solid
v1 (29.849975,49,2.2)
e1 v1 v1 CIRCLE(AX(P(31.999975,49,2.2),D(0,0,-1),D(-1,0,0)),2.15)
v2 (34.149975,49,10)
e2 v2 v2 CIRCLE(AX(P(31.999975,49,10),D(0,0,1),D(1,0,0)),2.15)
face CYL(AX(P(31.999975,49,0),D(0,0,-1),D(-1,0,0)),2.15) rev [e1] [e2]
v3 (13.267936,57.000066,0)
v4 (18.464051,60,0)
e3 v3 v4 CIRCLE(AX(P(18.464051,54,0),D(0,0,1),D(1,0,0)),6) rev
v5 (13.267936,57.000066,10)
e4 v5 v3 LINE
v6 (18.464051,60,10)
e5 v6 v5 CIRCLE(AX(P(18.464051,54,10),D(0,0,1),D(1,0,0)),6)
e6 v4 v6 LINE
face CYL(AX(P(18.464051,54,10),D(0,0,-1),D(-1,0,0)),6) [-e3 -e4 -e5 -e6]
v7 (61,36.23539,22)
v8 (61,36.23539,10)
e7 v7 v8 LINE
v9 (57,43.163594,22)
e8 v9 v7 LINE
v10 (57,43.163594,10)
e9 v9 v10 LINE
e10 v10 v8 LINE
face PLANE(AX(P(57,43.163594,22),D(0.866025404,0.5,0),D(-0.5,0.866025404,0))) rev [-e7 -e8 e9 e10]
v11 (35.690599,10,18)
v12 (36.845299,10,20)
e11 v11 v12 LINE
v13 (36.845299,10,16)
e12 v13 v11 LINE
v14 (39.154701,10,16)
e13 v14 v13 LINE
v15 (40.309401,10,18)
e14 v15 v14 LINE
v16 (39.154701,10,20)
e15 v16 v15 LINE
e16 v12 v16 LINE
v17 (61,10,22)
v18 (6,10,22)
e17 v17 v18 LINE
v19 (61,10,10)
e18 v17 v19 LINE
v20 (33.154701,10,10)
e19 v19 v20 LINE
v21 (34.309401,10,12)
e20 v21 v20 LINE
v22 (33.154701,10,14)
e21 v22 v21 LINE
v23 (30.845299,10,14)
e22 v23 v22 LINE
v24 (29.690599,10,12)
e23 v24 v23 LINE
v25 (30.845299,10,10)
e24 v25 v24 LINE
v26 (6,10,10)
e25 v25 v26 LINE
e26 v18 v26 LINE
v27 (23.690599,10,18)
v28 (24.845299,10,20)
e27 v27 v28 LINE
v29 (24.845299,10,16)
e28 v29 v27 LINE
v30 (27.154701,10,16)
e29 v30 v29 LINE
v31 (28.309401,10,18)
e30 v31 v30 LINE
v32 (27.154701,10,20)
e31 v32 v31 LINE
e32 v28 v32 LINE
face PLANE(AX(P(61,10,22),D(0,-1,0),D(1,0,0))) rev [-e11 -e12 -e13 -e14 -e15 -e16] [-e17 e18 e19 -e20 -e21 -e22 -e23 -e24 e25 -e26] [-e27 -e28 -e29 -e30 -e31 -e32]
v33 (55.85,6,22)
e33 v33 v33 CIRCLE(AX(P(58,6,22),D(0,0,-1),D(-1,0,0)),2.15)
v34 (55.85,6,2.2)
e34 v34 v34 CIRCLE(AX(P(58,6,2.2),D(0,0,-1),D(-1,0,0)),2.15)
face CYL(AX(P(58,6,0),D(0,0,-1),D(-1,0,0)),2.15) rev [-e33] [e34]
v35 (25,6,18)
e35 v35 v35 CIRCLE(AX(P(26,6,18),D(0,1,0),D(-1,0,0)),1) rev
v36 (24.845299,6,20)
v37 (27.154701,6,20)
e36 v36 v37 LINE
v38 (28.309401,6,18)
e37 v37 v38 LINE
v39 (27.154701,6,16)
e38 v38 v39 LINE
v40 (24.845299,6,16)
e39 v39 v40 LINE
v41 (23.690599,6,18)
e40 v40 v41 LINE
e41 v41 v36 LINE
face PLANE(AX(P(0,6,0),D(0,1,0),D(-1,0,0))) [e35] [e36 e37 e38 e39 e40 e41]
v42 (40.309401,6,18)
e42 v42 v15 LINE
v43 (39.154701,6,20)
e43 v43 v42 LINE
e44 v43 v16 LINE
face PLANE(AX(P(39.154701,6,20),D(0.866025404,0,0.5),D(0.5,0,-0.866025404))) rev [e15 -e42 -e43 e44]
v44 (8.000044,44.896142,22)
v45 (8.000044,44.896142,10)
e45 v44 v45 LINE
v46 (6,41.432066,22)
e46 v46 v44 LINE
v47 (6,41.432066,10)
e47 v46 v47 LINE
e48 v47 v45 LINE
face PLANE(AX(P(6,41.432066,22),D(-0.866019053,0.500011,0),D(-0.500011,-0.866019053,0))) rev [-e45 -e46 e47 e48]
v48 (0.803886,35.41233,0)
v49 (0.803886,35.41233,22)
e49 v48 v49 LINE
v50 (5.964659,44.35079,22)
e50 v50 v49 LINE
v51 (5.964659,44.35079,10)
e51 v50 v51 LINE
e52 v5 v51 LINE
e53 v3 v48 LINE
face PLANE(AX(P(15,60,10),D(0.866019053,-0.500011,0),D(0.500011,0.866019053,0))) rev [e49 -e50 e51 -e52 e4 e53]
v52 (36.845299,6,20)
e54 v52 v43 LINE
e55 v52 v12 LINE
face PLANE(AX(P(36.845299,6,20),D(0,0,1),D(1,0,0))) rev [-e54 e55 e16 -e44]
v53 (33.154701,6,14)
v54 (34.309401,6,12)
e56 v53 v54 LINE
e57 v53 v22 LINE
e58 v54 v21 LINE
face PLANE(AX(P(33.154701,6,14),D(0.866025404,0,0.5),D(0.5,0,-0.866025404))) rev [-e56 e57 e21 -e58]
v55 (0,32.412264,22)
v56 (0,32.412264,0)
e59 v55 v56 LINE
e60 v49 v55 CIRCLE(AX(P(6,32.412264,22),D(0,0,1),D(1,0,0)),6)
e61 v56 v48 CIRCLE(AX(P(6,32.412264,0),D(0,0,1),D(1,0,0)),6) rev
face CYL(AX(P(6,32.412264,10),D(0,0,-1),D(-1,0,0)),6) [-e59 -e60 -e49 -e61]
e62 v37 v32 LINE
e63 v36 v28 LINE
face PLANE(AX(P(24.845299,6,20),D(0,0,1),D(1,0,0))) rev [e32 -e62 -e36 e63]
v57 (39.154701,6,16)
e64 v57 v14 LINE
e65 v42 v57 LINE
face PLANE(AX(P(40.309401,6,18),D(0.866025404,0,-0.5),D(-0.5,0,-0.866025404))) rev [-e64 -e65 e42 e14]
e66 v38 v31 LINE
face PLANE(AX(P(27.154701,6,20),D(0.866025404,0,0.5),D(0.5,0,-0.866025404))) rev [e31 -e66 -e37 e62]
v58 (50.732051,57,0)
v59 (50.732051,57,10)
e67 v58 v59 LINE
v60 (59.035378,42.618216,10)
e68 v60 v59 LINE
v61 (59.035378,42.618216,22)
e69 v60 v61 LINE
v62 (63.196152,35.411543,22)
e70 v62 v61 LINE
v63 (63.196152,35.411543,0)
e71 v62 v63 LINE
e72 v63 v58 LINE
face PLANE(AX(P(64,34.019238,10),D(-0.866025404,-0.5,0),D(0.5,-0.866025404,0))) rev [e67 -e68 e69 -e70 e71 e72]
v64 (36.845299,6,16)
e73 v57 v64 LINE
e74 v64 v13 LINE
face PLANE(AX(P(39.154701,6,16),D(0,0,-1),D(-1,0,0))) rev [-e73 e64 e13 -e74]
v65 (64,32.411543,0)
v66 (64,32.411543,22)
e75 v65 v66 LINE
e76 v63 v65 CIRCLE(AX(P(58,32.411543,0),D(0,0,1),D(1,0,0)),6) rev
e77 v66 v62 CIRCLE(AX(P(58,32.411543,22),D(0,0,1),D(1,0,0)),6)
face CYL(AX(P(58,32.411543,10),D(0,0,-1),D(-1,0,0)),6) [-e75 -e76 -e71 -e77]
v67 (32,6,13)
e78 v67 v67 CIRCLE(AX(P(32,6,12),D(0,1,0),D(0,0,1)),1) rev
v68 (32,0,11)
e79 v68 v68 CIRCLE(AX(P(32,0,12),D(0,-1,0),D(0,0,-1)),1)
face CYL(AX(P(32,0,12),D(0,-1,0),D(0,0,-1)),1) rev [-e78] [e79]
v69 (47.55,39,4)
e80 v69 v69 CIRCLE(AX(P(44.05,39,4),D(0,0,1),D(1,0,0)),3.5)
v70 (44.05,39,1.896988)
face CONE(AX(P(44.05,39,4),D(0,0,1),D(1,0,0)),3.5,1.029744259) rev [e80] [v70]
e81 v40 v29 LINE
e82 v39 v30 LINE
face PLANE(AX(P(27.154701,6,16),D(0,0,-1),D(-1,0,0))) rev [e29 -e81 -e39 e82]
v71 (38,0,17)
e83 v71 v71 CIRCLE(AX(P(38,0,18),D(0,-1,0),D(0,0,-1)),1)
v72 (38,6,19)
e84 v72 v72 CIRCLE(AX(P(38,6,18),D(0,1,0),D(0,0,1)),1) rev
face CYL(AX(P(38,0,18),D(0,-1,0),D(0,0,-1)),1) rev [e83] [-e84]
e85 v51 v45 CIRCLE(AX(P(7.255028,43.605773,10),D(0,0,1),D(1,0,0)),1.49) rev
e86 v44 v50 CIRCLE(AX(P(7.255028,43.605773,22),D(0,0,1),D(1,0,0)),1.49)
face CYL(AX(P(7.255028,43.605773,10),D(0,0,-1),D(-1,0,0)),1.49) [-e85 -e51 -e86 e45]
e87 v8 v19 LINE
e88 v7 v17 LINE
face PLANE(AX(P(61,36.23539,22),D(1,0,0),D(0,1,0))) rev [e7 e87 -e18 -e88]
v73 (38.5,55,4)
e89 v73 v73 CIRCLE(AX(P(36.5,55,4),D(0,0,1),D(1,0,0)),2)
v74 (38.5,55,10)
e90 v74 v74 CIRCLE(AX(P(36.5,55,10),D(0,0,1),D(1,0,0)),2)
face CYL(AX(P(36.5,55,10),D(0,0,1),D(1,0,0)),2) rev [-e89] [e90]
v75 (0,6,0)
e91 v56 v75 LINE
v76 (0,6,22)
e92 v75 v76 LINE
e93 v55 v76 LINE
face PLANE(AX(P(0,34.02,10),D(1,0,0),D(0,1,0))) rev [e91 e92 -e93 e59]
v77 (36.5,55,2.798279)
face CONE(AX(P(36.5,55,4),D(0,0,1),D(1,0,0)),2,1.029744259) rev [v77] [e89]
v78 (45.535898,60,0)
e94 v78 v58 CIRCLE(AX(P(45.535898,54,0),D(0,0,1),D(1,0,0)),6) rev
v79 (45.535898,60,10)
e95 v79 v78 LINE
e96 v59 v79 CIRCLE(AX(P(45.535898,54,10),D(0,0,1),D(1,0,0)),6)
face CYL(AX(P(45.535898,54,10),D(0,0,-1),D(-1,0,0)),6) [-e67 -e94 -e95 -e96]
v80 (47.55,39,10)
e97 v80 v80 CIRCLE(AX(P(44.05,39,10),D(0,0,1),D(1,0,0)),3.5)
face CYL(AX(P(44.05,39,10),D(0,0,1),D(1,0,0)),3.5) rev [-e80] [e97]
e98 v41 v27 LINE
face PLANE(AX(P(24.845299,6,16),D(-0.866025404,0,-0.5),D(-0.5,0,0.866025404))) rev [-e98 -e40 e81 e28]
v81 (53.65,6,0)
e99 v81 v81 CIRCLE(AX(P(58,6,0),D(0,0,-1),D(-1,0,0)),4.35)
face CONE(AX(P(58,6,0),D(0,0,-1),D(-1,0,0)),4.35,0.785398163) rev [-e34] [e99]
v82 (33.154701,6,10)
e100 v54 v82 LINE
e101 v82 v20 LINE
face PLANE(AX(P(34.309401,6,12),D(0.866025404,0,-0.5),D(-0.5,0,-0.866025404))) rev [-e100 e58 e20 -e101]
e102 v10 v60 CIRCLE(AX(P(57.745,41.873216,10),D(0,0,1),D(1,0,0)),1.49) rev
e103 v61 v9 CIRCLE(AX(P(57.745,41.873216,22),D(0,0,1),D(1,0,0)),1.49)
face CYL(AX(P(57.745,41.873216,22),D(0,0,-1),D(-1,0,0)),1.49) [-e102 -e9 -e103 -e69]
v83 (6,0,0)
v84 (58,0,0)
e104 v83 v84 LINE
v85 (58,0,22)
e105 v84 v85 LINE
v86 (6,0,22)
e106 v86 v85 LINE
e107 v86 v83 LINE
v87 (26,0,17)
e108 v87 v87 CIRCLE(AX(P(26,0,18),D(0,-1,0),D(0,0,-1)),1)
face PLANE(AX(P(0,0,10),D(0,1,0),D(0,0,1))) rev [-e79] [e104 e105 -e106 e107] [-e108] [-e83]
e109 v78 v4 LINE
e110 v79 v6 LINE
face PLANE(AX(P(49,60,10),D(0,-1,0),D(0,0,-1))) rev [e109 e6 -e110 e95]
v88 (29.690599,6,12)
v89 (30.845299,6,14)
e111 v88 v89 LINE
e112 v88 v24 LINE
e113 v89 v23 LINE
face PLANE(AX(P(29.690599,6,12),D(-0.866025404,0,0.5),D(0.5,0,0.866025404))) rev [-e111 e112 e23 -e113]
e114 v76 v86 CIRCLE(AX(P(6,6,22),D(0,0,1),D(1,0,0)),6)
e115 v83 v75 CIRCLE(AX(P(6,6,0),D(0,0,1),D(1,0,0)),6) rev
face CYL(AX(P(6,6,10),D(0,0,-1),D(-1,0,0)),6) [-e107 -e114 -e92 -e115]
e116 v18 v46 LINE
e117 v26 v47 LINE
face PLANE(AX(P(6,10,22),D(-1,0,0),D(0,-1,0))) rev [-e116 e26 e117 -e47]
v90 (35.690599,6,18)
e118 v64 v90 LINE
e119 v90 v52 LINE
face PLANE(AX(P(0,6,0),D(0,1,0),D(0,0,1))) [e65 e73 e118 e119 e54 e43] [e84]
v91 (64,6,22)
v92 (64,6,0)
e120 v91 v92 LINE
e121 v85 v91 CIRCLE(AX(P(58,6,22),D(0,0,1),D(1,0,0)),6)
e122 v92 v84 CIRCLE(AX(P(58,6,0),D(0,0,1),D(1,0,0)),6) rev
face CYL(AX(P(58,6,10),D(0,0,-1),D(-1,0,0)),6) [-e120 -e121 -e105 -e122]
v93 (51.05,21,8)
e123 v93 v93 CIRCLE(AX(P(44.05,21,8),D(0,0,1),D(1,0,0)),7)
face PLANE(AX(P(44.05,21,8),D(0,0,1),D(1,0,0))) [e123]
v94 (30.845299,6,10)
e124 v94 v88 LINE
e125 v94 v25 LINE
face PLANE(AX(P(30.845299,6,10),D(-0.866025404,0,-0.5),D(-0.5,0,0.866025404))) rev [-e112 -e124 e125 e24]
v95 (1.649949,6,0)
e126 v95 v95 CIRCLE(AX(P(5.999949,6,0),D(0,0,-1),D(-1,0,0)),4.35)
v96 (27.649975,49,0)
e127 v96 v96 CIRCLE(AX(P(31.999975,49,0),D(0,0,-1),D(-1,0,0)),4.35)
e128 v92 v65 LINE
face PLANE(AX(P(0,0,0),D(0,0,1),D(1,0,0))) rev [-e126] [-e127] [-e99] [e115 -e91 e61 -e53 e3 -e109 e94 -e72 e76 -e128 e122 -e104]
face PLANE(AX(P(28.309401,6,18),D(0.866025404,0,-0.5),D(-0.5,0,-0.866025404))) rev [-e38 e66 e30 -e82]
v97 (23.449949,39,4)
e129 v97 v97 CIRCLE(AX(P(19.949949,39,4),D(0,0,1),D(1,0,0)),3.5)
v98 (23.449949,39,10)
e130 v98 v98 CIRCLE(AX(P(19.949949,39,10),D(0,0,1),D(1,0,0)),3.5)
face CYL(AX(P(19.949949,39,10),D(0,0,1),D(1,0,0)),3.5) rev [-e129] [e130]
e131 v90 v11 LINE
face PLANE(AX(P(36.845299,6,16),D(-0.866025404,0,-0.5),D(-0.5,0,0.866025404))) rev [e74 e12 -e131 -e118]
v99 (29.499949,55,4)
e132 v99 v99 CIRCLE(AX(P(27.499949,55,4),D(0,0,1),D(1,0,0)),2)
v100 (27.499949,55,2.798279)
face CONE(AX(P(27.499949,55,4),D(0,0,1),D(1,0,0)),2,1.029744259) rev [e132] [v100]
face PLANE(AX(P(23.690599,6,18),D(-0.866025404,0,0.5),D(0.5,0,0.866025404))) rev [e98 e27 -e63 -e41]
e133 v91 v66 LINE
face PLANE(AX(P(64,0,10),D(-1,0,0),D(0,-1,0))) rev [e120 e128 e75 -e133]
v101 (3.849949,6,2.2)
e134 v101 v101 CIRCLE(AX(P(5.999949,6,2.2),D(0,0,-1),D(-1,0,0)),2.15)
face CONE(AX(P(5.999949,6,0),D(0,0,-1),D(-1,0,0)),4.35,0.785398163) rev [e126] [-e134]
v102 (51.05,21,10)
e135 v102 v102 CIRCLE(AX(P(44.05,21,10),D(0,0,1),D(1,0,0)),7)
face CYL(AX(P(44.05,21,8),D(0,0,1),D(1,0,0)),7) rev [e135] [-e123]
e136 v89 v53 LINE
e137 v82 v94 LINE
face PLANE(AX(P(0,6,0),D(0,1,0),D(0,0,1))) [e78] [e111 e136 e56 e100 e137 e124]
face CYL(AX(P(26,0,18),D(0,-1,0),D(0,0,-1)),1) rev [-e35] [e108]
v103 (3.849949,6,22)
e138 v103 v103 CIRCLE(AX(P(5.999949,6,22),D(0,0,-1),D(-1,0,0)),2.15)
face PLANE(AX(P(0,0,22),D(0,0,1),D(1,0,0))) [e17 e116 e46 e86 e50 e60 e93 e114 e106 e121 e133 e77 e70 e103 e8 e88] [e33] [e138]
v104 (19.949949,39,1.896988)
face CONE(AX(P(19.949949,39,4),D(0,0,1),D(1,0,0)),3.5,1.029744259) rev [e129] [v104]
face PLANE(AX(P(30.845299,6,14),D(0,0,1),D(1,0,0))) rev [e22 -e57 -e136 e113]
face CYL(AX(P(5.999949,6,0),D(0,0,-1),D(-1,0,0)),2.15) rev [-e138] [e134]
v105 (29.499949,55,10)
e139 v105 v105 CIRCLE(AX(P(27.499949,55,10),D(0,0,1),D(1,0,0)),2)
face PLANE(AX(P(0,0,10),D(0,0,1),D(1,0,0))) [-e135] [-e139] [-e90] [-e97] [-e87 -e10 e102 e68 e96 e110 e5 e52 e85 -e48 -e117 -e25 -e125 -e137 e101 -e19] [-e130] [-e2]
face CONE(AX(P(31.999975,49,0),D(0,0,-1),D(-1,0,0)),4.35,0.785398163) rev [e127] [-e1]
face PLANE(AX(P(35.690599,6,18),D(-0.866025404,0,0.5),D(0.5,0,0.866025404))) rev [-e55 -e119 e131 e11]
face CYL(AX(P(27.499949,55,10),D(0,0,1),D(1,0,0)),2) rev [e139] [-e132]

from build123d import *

# Parameters (mm, degrees)
EXTRUDE_1_DEPTH             = 10
EXTRUDE_2_DEPTH             = 12
FILLET_1_R                  = 6
FILLET_2_R                  = 1.49
HOLE_WIZARD_M44_D           = 4.3
HOLE_WIZARD_M44_CSINK_D     = 8.7
HOLE_WIZARD_M44_CSINK_ANGLE = 90
HOLE_WIZARD_4_0_2_D         = 4
HOLE_WIZARD_4_0_2_DEPTH     = 6
HOLE_WIZARD_4_0_2_TIP       = 1.2017212380551205
HOLE_WIZARD_7_0_7_1_D       = 7
HOLE_WIZARD_7_0_7_1_DEPTH   = 6
HOLE_WIZARD_7_0_7_1_TIP     = 2.103012166596461
SKETCH_54_R                 = 6.999999999999999
CUT_EXTRUDE_5_DEPTH         = 2
HOLE_WIZARD_M2_21_D         = 2
HOLE_WIZARD_M2_21_DEPTH     = 10
HOLE_WIZARD_M2_21_TIP       = 0.6008606190275603
CUT_EXTRUDE_11_DEPTH        = 4
HOLE_WIZARD_M2_22_D         = 2
HOLE_WIZARD_M2_22_DEPTH     = 10
HOLE_WIZARD_M2_22_TIP       = 0.6008606190275603
CUT_EXTRUDE_12_DEPTH        = 4


with BuildPart() as part:
    # Эскиз1 → Бобышка-Вытянуть1 (new body)
    with BuildSketch(Plane.XY):
        Polygon((0, 0), (64, 0), (64.00000000000001, 34.01923788646688), (48.99999999999994, 59.99999999999999), (14.999999999999943, 59.99999999999999), (0, 34.02), align=None)
    extrude(amount=EXTRUDE_1_DEPTH)

    # Эскиз3 → Бобышка-Вытянуть2 (add)
    with BuildSketch(Plane.XY.offset(10)):
        Polygon((0, 0), (64, 0), (64.00000000000001, 34.01923788646688), (58.29037785163881, 43.90859353944907), (57, 43.16359353944907), (60.99999999999999, 36.23539030917355), (61.00000000000001, 9.999999999999998), (6.000000000000005, 9.999999999999993), (6, 41.43206556072121), (8.000044001452048, 44.896141771236174), (6.709675613035229, 45.64115816177706), (0, 34.02), align=None)
    extrude(amount=EXTRUDE_2_DEPTH)

    # Скругление1
    fillet_1_edges = [part.edges().sort_by_distance(p)[0] for p in [
        (0, 34.02, 11),
        (14.999999999999943, 59.99999999999999, 5),
        (48.99999999999994, 59.99999999999999, 5),
        (64.00000000000001, 34.01923788646688, 11),
        (64, 0, 11),
        (0, 0, 11),
    ]]
    fillet(fillet_1_edges, radius=FILLET_1_R)

    # Скругление2
    fillet_2_edges = [part.edges().sort_by_distance(p)[0] for p in [
        (58.29037785163881, 43.90859353944907, 16),
        (6.709675613035229, 45.64115816177706, 16),
    ]]
    fillet(fillet_2_edges, radius=FILLET_2_R - 0.0001)  # a hair under: the kernel refuses the full size

    # Зенковка для  винта с плоской головкой M44 (through all)
    with Locations(Plane(origin=(0, 0, 0), x_dir=(-1, 0, 0), z_dir=(0, 0, -1))):
        with Locations((-5.999949191, 6), (-58, 6), (-31.999974596, 49)):
            CounterSinkHole(HOLE_WIZARD_M44_D / 2, HOLE_WIZARD_M44_CSINK_D / 2, counter_sink_angle=HOLE_WIZARD_M44_CSINK_ANGLE)

    # Отверстия под штифты Ø4.0 мм2
    with Locations(Plane(origin=(0, 0, 10), x_dir=(-1, 0, 0), z_dir=(0, 0, 1))):
        with Locations((-36.5, -55), (-27.499949191, -55)):
            Hole(HOLE_WIZARD_4_0_2_D / 2, depth=HOLE_WIZARD_4_0_2_DEPTH)
            with Locations((0, 0, -(HOLE_WIZARD_4_0_2_DEPTH + HOLE_WIZARD_4_0_2_TIP / 2))):  # 118° drill point
                Cone(0, HOLE_WIZARD_4_0_2_D / 2, HOLE_WIZARD_4_0_2_TIP, mode=Mode.SUBTRACT)

    # Диаметр отверстия Ø7.0 (7)1
    with Locations(Plane(origin=(0, 0, 10), x_dir=(-1, 0, 0), z_dir=(0, 0, 1))):
        with Locations((-44.05, -39), (-19.949949191, -39)):
            Hole(HOLE_WIZARD_7_0_7_1_D / 2, depth=HOLE_WIZARD_7_0_7_1_DEPTH)
            with Locations((0, 0, -(HOLE_WIZARD_7_0_7_1_DEPTH + HOLE_WIZARD_7_0_7_1_TIP / 2))):  # 118° drill point
                Cone(0, HOLE_WIZARD_7_0_7_1_D / 2, HOLE_WIZARD_7_0_7_1_TIP, mode=Mode.SUBTRACT)

    # Эскиз54 → Вырез-Вытянуть5 (cut)
    with BuildSketch(Plane.XY.offset(10)):
        with Locations((44.050000000000004, 21)):
            Circle(SKETCH_54_R)
    extrude(amount=-CUT_EXTRUDE_5_DEPTH, mode=Mode.SUBTRACT)

    # Сверло под метчик  спиральное M2.21
    with Locations(Plane(origin=(0, 0, 0), x_dir=(-1, 0, 0), z_dir=(0, -1, 0))):
        with Locations((-26, -18), (-38, -18)):
            Hole(HOLE_WIZARD_M2_21_D / 2, depth=HOLE_WIZARD_M2_21_DEPTH)
            with Locations((0, 0, -(HOLE_WIZARD_M2_21_DEPTH + HOLE_WIZARD_M2_21_TIP / 2))):  # 118° drill point
                Cone(0, HOLE_WIZARD_M2_21_D / 2, HOLE_WIZARD_M2_21_TIP, mode=Mode.SUBTRACT)

    # Эскиз58 → Вырез-Вытянуть11 (cut)
    with BuildSketch(Plane(origin=(-9.5e-16, 9.999999999999993, 0), x_dir=(1, 9e-17, 0), z_dir=(-9e-17, 1, 0))):
        Polygon((28.309401076758505, -17.999999999999993), (27.154700538379252, -15.99999999999999), (24.845299461620748, -15.999999999999986), (23.690598923241495, -17.999999999999986), (24.845299461620744, -19.999999999999982), (27.154700538379256, -19.999999999999986), align=None)
        Polygon((40.3094010767585, -17.999999999999993), (39.154700538379245, -15.999999999999993), (36.845299461620755, -15.99999999999999), (35.6905989232415, -17.999999999999996), (36.84529946162075, -19.999999999999993), (39.15470053837924, -19.999999999999996), align=None)
    extrude(amount=-CUT_EXTRUDE_11_DEPTH, mode=Mode.SUBTRACT)

    # Сверло под метчик  спиральное M2.22
    with Locations(Plane(origin=(0, 0, 0), x_dir=(-1, 0, 0), z_dir=(0, -1, 0))):
        with Locations((-32, -12)):
            Hole(HOLE_WIZARD_M2_22_D / 2, depth=HOLE_WIZARD_M2_22_DEPTH)
            with Locations((0, 0, -(HOLE_WIZARD_M2_22_DEPTH + HOLE_WIZARD_M2_22_TIP / 2))):  # 118° drill point
                Cone(0, HOLE_WIZARD_M2_22_D / 2, HOLE_WIZARD_M2_22_TIP, mode=Mode.SUBTRACT)

    # Эскиз61 → Вырез-Вытянуть12 (cut)
    with BuildSketch(Plane(origin=(-9.5e-16, 9.999999999999993, 0), x_dir=(1, 9e-17, 0), z_dir=(-9e-17, 1, 0))):
        Polygon((34.3094010767585, -11.999999999999998), (33.15470053837925, -10.000000000000002), (30.84529946162075, -9.999999999999998), (29.690598923241495, -11.999999999999996), (30.845299461620744, -13.999999999999996), (33.15470053837924, -14), align=None)
    extrude(amount=-CUT_EXTRUDE_12_DEPTH, mode=Mode.SUBTRACT)


solid = part.part
